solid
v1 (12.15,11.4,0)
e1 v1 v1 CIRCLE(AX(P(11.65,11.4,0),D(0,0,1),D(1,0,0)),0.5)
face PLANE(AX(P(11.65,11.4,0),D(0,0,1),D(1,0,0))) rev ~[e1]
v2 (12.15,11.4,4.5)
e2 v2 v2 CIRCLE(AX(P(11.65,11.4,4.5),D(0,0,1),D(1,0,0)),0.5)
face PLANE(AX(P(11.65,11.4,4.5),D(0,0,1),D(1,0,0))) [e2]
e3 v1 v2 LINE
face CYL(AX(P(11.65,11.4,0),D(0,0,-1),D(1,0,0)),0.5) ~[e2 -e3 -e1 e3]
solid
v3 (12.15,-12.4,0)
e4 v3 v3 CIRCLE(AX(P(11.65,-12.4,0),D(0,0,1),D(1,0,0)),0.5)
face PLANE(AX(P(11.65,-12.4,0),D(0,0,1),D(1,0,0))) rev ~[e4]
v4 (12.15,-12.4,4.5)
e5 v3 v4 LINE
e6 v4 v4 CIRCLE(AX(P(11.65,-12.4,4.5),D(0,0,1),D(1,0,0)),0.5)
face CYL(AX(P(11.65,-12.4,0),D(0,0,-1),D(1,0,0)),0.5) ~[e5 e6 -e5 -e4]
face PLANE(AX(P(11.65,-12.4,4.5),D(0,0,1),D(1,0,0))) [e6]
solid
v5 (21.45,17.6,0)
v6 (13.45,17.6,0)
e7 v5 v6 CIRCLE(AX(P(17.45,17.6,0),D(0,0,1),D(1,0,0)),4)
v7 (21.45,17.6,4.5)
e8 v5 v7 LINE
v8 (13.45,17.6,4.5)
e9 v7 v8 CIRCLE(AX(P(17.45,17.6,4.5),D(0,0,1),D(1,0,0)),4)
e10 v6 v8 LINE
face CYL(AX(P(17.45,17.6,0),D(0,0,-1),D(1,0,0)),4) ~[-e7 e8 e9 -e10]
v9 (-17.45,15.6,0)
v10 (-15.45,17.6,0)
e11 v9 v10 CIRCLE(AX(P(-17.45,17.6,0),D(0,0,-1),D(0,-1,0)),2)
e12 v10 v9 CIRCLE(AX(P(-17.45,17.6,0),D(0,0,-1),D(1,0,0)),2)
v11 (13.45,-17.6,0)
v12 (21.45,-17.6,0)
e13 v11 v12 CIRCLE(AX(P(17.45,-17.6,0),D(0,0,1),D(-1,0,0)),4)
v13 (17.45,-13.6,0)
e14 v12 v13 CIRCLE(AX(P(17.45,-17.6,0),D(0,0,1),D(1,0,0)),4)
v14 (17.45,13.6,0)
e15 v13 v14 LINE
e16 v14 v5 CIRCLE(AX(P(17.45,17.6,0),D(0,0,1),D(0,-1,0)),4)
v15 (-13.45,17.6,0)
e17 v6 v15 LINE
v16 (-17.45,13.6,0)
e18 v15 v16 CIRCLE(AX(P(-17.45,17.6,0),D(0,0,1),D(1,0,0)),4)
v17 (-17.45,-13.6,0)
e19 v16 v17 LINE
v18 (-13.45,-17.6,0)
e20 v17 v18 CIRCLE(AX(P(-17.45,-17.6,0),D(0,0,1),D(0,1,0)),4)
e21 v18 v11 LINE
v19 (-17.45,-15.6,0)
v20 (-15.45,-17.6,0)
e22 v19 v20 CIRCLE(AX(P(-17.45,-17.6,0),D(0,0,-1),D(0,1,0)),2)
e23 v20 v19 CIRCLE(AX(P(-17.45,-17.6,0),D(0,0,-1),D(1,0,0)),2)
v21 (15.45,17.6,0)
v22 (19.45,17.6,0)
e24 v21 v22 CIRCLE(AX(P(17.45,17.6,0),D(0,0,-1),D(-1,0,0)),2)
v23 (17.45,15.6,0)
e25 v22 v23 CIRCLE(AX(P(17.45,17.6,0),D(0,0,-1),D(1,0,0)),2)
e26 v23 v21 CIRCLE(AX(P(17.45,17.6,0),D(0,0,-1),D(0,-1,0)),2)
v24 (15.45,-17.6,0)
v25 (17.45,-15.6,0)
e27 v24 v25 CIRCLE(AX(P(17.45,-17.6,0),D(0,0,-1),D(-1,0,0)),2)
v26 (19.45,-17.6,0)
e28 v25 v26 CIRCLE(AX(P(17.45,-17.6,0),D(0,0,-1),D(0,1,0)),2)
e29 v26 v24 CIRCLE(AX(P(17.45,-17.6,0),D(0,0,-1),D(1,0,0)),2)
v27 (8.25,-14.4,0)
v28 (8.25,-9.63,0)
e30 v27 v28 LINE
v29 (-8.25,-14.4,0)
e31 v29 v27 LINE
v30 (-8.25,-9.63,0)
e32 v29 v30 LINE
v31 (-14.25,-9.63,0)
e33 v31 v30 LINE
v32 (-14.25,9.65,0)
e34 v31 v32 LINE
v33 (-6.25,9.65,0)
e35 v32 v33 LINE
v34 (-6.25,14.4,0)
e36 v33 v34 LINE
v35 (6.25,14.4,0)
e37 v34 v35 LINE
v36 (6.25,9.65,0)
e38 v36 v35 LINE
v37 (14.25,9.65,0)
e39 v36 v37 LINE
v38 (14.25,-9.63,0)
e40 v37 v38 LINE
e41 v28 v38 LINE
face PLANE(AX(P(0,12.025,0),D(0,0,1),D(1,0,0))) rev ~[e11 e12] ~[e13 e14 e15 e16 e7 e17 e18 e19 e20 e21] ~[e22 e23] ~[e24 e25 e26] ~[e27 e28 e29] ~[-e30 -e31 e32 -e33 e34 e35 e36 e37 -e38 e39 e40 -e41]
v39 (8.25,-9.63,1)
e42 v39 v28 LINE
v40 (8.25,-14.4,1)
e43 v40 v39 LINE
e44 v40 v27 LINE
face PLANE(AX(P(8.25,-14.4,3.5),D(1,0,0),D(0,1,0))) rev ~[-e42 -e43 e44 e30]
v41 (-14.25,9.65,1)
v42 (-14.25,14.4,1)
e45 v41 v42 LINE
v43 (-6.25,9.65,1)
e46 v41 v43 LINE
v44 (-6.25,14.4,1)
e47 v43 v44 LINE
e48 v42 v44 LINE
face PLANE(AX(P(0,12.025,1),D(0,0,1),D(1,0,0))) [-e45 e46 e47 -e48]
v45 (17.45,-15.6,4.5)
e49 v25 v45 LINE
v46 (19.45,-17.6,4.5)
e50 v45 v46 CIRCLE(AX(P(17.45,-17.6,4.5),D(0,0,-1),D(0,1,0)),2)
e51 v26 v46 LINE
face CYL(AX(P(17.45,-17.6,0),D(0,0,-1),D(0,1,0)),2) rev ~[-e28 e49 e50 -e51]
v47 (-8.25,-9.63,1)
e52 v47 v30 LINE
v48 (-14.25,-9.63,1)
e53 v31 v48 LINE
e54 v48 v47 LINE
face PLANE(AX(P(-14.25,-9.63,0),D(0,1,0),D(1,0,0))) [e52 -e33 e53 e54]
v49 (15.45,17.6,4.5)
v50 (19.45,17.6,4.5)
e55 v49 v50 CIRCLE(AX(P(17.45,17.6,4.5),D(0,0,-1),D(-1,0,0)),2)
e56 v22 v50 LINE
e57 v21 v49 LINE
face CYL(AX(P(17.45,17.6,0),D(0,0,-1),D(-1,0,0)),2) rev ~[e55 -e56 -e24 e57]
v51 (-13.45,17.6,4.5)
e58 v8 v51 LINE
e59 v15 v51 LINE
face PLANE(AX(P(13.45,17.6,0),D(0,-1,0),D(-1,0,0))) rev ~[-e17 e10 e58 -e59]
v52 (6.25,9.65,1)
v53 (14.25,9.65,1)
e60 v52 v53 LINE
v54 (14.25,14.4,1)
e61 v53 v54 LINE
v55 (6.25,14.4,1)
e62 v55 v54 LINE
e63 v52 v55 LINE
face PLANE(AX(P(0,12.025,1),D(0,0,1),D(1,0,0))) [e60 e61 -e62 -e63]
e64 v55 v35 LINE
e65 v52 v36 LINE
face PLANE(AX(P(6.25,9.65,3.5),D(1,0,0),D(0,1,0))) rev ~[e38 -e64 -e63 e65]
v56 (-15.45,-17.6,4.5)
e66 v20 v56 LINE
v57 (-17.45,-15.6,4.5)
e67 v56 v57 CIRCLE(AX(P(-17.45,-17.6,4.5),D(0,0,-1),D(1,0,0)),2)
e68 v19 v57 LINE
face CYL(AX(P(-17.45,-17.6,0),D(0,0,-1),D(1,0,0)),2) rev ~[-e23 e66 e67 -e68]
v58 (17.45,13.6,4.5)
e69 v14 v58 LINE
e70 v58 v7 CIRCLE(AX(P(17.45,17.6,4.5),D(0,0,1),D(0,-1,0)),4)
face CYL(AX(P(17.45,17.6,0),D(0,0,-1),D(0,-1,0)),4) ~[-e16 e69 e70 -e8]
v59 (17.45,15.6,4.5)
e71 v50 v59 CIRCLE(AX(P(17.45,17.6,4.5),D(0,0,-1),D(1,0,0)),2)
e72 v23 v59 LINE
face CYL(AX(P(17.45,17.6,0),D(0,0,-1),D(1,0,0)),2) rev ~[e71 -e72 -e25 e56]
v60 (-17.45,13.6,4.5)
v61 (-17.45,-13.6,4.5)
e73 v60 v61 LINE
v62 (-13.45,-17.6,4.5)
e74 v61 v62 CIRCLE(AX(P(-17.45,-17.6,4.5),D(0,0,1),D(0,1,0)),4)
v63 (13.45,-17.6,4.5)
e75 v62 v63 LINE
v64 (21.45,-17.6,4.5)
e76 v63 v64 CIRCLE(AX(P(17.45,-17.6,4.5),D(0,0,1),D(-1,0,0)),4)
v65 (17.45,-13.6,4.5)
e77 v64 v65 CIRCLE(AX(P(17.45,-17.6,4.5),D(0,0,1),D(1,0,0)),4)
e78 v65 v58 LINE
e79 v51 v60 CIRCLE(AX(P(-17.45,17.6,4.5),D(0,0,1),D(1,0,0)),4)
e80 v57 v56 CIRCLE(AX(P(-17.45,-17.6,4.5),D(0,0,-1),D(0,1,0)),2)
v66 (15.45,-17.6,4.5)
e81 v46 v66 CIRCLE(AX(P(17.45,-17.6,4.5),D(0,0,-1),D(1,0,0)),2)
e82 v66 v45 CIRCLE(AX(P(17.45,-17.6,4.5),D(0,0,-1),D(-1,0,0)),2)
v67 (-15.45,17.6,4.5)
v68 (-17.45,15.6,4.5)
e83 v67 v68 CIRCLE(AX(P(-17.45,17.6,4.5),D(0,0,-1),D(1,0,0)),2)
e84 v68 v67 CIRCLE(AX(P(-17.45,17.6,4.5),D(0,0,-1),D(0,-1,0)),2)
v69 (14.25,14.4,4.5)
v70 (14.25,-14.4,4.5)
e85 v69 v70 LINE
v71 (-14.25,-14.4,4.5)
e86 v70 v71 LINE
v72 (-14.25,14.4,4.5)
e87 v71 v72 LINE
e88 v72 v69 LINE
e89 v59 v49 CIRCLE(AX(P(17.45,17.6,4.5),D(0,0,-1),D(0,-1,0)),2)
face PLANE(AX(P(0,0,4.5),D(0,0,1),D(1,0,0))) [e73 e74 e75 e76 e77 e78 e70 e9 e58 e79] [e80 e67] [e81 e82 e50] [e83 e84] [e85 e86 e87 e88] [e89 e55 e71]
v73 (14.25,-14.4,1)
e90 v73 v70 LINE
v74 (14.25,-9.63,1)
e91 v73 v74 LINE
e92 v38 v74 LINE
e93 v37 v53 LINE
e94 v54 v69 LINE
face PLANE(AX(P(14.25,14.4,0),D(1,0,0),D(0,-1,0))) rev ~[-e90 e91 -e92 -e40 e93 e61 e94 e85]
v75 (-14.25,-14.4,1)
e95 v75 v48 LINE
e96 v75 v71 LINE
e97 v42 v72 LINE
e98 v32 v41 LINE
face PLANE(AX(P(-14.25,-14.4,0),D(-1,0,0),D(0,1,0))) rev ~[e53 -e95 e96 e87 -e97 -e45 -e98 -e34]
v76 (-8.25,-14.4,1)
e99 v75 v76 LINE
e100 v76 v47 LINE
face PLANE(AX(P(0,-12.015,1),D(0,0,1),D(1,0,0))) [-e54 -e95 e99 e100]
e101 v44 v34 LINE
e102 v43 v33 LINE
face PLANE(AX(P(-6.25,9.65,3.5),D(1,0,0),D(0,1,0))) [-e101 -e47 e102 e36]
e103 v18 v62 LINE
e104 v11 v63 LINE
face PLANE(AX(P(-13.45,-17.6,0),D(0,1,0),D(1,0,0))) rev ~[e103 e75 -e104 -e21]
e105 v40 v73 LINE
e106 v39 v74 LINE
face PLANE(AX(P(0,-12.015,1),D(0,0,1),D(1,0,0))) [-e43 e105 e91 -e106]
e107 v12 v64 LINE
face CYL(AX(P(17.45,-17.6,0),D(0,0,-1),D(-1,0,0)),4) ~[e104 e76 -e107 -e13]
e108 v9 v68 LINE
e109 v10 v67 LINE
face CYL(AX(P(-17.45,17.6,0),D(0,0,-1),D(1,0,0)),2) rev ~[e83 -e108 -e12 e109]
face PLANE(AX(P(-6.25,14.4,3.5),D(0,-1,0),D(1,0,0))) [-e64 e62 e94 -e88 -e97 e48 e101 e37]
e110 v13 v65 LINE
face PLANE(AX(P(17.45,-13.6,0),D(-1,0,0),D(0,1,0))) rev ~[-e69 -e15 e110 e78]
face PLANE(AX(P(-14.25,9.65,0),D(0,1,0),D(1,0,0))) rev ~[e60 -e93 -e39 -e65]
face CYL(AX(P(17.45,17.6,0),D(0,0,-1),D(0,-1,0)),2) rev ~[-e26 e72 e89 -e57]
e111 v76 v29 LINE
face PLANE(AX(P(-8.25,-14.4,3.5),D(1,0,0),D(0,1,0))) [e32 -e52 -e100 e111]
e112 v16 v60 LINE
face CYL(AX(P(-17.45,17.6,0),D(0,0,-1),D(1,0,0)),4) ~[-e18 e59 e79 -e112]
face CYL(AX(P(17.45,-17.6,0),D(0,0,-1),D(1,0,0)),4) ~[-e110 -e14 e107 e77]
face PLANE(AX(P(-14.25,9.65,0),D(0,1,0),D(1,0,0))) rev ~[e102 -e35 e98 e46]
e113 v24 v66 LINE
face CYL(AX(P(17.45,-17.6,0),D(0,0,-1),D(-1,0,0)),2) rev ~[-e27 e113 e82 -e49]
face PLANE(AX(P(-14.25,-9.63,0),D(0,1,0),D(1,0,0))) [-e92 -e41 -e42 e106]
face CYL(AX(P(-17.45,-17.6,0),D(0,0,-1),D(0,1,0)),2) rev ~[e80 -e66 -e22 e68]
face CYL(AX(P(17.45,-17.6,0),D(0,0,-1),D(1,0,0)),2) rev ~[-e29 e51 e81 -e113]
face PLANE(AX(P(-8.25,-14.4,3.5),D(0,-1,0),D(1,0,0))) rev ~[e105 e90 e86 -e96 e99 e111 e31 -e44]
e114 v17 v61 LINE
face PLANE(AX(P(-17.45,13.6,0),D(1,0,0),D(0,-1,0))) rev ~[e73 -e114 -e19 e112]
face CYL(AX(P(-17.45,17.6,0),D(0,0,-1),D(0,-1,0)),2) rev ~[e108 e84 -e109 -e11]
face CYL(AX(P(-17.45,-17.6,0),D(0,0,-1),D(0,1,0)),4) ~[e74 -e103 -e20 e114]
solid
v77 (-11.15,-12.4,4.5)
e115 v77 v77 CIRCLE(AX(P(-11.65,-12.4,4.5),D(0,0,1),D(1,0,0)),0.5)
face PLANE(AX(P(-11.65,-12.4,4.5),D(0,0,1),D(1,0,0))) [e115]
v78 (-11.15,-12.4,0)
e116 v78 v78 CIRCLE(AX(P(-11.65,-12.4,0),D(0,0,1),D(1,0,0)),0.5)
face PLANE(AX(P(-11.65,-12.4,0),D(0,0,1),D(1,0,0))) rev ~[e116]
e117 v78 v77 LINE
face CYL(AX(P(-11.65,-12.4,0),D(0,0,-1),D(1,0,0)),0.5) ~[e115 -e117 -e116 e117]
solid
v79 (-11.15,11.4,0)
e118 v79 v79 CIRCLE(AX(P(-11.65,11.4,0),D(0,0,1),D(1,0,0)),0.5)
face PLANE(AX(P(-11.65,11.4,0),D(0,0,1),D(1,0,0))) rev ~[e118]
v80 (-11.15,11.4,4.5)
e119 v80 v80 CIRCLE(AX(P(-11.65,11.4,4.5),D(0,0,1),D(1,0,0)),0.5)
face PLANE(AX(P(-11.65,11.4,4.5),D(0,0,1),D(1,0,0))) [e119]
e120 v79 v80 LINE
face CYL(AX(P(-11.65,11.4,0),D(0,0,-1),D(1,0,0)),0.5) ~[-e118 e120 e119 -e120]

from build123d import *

# Parameters (mm, degrees)
F1_DEPTH = 4.5
F0_R     = 0.5
F2_W     = 28.5
F2_H     = 4.75
F2_H_2   = 4.77
F3_DEPTH = 1
F5_W     = 12.5
F5_H     = 4.75
F5_W_2   = 16.5
F5_H_2   = 4.77
F6_DEPTH = 3.5


with BuildPart() as f1:
    # F0 (on Top) → F1 (new body)
    with BuildSketch(Plane.XY):
        with BuildLine():
            Line((17.45, -13.6), (17.45, 13.6))
            ThreePointArc((17.45, 13.6), (14.6215728753, 14.7715728753), (13.45, 17.6))
            Line((13.45, 17.6), (-13.45, 17.6))
            ThreePointArc((-13.45, 17.6), (-14.6215728753, 14.7715728753), (-17.45, 13.6))
            Line((-17.45, 13.6), (-17.45, -13.6))
            ThreePointArc((-17.45, -13.6), (-14.6215728753, -14.7715728753), (-13.45, -17.6))
            Line((-13.45, -17.6), (13.45, -17.6))
            ThreePointArc((13.45, -17.6), (14.6215728753, -14.7715728753), (17.45, -13.6))
        make_face()
        Polygon((-14.25, 9.65), (-14.25, 14.4), (14.25, 14.4), (14.25, 9.65), (14.25, -9.63), (14.25, -14.4), (-14.25, -14.4), (-14.25, -9.63), align=None, mode=Mode.SUBTRACT)
        with BuildLine():
            Line((-15.45, 17.6), (-13.45, 17.6))
            ThreePointArc((-13.45, 17.6), (-20.2784271247, 20.4284271247), (-17.45, 13.6))
            Line((-17.45, 13.6), (-17.45, 15.6))
            ThreePointArc((-17.45, 15.6), (-18.8642135624, 19.0142135624), (-15.45, 17.6))
        make_face()
        with BuildLine():
            ThreePointArc((19.45, 17.6), (18.8642135624, 16.1857864376), (17.45, 15.6))
            Line((17.45, 15.6), (17.45, 13.6))
            ThreePointArc((17.45, 13.6), (20.2784271247, 14.7715728753), (21.45, 17.6))
            ThreePointArc((21.45, 17.6), (17.45, 21.6), (13.45, 17.6))
            Line((13.45, 17.6), (15.45, 17.6))
            ThreePointArc((15.45, 17.6), (17.45, 19.6), (19.45, 17.6))
        make_face()
        with BuildLine():
            ThreePointArc((21.45, -17.6), (20.2784271247, -14.7715728753), (17.45, -13.6))
            Line((17.45, -13.6), (17.45, -15.6))
            ThreePointArc((17.45, -15.6), (18.8642135624, -16.1857864376), (19.45, -17.6))
            ThreePointArc((19.45, -17.6), (17.45, -19.6), (15.45, -17.6))
            Line((15.45, -17.6), (13.45, -17.6))
            ThreePointArc((13.45, -17.6), (17.45, -21.6), (21.45, -17.6))
        make_face()
        with BuildLine():
            ThreePointArc((-17.45, -13.6), (-20.2784271247, -20.4284271247), (-13.45, -17.6))
            Line((-13.45, -17.6), (-15.45, -17.6))
            ThreePointArc((-15.45, -17.6), (-18.8642135624, -19.0142135624), (-17.45, -15.6))
            Line((-17.45, -15.6), (-17.45, -13.6))
        make_face()
        with BuildLine():
            ThreePointArc((-17.45, 13.6), (-14.6215728753, 14.7715728753), (-13.45, 17.6))
            Line((-13.45, 17.6), (-15.45, 17.6))
            ThreePointArc((-15.45, 17.6), (-16.0357864376, 16.1857864376), (-17.45, 15.6))
            Line((-17.45, 15.6), (-17.45, 13.6))
        make_face()
        with BuildLine():
            Line((17.45, 13.6), (17.45, 15.6))
            ThreePointArc((17.45, 15.6), (16.0357864376, 16.1857864376), (15.45, 17.6))
            Line((15.45, 17.6), (13.45, 17.6))
            ThreePointArc((13.45, 17.6), (14.6215728753, 14.7715728753), (17.45, 13.6))
        make_face()
        with BuildLine():
            Line((17.45, -15.6), (17.45, -13.6))
            ThreePointArc((17.45, -13.6), (14.6215728753, -14.7715728753), (13.45, -17.6))
            Line((13.45, -17.6), (15.45, -17.6))
            ThreePointArc((15.45, -17.6), (16.0357864376, -16.1857864376), (17.45, -15.6))
        make_face()
        with BuildLine():
            Line((-15.45, -17.6), (-13.45, -17.6))
            ThreePointArc((-13.45, -17.6), (-14.6215728753, -14.7715728753), (-17.45, -13.6))
            Line((-17.45, -13.6), (-17.45, -15.6))
            ThreePointArc((-17.45, -15.6), (-16.0357864376, -16.1857864376), (-15.45, -17.6))
        make_face()
    extrude(amount=F1_DEPTH)

    # F2 (on Top) → F3 (join)
    with BuildSketch(Plane.XY):
        with Locations((0, 12.025)):
            Rectangle(F2_W, F2_H)
        with Locations((0, -12.015)):
            Rectangle(F2_W, F2_H_2)
    extrude(amount=F3_DEPTH)

    # F5 (on offset) → F6 (cut)
    with BuildSketch(Plane.XY.offset(3.5)):
        with Locations((0, 12.025)):
            Rectangle(F5_W, F5_H)
        with Locations((0, -12.015)):
            Rectangle(F5_W_2, F5_H_2)
    extrude(amount=-F6_DEPTH, mode=Mode.SUBTRACT)


with BuildPart() as f1b:
    # F0 (on Top) → F1, piece 2 (new body)
    with BuildSketch(Plane.XY):
        with Locations((-11.65, 11.4)):
            Circle(F0_R)
    extrude(amount=F1_DEPTH)


with BuildPart() as f1c:
    # F0 (on Top) → F1, piece 3 (new body)
    with BuildSketch(Plane.XY):
        with Locations((11.65, 11.4)):
            Circle(F0_R)
    extrude(amount=F1_DEPTH)


with BuildPart() as f1d:
    # F0 (on Top) → F1, piece 4 (new body)
    with BuildSketch(Plane.XY):
        with Locations((11.65, -12.4)):
            Circle(F0_R)
    extrude(amount=F1_DEPTH)


with BuildPart() as f1e:
    # F0 (on Top) → F1, piece 5 (new body)
    with BuildSketch(Plane.XY):
        with Locations((-11.65, -12.4)):
            Circle(F0_R)
    extrude(amount=F1_DEPTH)


solid = Compound([f1.part, f1b.part, f1c.part, f1d.part, f1e.part])
